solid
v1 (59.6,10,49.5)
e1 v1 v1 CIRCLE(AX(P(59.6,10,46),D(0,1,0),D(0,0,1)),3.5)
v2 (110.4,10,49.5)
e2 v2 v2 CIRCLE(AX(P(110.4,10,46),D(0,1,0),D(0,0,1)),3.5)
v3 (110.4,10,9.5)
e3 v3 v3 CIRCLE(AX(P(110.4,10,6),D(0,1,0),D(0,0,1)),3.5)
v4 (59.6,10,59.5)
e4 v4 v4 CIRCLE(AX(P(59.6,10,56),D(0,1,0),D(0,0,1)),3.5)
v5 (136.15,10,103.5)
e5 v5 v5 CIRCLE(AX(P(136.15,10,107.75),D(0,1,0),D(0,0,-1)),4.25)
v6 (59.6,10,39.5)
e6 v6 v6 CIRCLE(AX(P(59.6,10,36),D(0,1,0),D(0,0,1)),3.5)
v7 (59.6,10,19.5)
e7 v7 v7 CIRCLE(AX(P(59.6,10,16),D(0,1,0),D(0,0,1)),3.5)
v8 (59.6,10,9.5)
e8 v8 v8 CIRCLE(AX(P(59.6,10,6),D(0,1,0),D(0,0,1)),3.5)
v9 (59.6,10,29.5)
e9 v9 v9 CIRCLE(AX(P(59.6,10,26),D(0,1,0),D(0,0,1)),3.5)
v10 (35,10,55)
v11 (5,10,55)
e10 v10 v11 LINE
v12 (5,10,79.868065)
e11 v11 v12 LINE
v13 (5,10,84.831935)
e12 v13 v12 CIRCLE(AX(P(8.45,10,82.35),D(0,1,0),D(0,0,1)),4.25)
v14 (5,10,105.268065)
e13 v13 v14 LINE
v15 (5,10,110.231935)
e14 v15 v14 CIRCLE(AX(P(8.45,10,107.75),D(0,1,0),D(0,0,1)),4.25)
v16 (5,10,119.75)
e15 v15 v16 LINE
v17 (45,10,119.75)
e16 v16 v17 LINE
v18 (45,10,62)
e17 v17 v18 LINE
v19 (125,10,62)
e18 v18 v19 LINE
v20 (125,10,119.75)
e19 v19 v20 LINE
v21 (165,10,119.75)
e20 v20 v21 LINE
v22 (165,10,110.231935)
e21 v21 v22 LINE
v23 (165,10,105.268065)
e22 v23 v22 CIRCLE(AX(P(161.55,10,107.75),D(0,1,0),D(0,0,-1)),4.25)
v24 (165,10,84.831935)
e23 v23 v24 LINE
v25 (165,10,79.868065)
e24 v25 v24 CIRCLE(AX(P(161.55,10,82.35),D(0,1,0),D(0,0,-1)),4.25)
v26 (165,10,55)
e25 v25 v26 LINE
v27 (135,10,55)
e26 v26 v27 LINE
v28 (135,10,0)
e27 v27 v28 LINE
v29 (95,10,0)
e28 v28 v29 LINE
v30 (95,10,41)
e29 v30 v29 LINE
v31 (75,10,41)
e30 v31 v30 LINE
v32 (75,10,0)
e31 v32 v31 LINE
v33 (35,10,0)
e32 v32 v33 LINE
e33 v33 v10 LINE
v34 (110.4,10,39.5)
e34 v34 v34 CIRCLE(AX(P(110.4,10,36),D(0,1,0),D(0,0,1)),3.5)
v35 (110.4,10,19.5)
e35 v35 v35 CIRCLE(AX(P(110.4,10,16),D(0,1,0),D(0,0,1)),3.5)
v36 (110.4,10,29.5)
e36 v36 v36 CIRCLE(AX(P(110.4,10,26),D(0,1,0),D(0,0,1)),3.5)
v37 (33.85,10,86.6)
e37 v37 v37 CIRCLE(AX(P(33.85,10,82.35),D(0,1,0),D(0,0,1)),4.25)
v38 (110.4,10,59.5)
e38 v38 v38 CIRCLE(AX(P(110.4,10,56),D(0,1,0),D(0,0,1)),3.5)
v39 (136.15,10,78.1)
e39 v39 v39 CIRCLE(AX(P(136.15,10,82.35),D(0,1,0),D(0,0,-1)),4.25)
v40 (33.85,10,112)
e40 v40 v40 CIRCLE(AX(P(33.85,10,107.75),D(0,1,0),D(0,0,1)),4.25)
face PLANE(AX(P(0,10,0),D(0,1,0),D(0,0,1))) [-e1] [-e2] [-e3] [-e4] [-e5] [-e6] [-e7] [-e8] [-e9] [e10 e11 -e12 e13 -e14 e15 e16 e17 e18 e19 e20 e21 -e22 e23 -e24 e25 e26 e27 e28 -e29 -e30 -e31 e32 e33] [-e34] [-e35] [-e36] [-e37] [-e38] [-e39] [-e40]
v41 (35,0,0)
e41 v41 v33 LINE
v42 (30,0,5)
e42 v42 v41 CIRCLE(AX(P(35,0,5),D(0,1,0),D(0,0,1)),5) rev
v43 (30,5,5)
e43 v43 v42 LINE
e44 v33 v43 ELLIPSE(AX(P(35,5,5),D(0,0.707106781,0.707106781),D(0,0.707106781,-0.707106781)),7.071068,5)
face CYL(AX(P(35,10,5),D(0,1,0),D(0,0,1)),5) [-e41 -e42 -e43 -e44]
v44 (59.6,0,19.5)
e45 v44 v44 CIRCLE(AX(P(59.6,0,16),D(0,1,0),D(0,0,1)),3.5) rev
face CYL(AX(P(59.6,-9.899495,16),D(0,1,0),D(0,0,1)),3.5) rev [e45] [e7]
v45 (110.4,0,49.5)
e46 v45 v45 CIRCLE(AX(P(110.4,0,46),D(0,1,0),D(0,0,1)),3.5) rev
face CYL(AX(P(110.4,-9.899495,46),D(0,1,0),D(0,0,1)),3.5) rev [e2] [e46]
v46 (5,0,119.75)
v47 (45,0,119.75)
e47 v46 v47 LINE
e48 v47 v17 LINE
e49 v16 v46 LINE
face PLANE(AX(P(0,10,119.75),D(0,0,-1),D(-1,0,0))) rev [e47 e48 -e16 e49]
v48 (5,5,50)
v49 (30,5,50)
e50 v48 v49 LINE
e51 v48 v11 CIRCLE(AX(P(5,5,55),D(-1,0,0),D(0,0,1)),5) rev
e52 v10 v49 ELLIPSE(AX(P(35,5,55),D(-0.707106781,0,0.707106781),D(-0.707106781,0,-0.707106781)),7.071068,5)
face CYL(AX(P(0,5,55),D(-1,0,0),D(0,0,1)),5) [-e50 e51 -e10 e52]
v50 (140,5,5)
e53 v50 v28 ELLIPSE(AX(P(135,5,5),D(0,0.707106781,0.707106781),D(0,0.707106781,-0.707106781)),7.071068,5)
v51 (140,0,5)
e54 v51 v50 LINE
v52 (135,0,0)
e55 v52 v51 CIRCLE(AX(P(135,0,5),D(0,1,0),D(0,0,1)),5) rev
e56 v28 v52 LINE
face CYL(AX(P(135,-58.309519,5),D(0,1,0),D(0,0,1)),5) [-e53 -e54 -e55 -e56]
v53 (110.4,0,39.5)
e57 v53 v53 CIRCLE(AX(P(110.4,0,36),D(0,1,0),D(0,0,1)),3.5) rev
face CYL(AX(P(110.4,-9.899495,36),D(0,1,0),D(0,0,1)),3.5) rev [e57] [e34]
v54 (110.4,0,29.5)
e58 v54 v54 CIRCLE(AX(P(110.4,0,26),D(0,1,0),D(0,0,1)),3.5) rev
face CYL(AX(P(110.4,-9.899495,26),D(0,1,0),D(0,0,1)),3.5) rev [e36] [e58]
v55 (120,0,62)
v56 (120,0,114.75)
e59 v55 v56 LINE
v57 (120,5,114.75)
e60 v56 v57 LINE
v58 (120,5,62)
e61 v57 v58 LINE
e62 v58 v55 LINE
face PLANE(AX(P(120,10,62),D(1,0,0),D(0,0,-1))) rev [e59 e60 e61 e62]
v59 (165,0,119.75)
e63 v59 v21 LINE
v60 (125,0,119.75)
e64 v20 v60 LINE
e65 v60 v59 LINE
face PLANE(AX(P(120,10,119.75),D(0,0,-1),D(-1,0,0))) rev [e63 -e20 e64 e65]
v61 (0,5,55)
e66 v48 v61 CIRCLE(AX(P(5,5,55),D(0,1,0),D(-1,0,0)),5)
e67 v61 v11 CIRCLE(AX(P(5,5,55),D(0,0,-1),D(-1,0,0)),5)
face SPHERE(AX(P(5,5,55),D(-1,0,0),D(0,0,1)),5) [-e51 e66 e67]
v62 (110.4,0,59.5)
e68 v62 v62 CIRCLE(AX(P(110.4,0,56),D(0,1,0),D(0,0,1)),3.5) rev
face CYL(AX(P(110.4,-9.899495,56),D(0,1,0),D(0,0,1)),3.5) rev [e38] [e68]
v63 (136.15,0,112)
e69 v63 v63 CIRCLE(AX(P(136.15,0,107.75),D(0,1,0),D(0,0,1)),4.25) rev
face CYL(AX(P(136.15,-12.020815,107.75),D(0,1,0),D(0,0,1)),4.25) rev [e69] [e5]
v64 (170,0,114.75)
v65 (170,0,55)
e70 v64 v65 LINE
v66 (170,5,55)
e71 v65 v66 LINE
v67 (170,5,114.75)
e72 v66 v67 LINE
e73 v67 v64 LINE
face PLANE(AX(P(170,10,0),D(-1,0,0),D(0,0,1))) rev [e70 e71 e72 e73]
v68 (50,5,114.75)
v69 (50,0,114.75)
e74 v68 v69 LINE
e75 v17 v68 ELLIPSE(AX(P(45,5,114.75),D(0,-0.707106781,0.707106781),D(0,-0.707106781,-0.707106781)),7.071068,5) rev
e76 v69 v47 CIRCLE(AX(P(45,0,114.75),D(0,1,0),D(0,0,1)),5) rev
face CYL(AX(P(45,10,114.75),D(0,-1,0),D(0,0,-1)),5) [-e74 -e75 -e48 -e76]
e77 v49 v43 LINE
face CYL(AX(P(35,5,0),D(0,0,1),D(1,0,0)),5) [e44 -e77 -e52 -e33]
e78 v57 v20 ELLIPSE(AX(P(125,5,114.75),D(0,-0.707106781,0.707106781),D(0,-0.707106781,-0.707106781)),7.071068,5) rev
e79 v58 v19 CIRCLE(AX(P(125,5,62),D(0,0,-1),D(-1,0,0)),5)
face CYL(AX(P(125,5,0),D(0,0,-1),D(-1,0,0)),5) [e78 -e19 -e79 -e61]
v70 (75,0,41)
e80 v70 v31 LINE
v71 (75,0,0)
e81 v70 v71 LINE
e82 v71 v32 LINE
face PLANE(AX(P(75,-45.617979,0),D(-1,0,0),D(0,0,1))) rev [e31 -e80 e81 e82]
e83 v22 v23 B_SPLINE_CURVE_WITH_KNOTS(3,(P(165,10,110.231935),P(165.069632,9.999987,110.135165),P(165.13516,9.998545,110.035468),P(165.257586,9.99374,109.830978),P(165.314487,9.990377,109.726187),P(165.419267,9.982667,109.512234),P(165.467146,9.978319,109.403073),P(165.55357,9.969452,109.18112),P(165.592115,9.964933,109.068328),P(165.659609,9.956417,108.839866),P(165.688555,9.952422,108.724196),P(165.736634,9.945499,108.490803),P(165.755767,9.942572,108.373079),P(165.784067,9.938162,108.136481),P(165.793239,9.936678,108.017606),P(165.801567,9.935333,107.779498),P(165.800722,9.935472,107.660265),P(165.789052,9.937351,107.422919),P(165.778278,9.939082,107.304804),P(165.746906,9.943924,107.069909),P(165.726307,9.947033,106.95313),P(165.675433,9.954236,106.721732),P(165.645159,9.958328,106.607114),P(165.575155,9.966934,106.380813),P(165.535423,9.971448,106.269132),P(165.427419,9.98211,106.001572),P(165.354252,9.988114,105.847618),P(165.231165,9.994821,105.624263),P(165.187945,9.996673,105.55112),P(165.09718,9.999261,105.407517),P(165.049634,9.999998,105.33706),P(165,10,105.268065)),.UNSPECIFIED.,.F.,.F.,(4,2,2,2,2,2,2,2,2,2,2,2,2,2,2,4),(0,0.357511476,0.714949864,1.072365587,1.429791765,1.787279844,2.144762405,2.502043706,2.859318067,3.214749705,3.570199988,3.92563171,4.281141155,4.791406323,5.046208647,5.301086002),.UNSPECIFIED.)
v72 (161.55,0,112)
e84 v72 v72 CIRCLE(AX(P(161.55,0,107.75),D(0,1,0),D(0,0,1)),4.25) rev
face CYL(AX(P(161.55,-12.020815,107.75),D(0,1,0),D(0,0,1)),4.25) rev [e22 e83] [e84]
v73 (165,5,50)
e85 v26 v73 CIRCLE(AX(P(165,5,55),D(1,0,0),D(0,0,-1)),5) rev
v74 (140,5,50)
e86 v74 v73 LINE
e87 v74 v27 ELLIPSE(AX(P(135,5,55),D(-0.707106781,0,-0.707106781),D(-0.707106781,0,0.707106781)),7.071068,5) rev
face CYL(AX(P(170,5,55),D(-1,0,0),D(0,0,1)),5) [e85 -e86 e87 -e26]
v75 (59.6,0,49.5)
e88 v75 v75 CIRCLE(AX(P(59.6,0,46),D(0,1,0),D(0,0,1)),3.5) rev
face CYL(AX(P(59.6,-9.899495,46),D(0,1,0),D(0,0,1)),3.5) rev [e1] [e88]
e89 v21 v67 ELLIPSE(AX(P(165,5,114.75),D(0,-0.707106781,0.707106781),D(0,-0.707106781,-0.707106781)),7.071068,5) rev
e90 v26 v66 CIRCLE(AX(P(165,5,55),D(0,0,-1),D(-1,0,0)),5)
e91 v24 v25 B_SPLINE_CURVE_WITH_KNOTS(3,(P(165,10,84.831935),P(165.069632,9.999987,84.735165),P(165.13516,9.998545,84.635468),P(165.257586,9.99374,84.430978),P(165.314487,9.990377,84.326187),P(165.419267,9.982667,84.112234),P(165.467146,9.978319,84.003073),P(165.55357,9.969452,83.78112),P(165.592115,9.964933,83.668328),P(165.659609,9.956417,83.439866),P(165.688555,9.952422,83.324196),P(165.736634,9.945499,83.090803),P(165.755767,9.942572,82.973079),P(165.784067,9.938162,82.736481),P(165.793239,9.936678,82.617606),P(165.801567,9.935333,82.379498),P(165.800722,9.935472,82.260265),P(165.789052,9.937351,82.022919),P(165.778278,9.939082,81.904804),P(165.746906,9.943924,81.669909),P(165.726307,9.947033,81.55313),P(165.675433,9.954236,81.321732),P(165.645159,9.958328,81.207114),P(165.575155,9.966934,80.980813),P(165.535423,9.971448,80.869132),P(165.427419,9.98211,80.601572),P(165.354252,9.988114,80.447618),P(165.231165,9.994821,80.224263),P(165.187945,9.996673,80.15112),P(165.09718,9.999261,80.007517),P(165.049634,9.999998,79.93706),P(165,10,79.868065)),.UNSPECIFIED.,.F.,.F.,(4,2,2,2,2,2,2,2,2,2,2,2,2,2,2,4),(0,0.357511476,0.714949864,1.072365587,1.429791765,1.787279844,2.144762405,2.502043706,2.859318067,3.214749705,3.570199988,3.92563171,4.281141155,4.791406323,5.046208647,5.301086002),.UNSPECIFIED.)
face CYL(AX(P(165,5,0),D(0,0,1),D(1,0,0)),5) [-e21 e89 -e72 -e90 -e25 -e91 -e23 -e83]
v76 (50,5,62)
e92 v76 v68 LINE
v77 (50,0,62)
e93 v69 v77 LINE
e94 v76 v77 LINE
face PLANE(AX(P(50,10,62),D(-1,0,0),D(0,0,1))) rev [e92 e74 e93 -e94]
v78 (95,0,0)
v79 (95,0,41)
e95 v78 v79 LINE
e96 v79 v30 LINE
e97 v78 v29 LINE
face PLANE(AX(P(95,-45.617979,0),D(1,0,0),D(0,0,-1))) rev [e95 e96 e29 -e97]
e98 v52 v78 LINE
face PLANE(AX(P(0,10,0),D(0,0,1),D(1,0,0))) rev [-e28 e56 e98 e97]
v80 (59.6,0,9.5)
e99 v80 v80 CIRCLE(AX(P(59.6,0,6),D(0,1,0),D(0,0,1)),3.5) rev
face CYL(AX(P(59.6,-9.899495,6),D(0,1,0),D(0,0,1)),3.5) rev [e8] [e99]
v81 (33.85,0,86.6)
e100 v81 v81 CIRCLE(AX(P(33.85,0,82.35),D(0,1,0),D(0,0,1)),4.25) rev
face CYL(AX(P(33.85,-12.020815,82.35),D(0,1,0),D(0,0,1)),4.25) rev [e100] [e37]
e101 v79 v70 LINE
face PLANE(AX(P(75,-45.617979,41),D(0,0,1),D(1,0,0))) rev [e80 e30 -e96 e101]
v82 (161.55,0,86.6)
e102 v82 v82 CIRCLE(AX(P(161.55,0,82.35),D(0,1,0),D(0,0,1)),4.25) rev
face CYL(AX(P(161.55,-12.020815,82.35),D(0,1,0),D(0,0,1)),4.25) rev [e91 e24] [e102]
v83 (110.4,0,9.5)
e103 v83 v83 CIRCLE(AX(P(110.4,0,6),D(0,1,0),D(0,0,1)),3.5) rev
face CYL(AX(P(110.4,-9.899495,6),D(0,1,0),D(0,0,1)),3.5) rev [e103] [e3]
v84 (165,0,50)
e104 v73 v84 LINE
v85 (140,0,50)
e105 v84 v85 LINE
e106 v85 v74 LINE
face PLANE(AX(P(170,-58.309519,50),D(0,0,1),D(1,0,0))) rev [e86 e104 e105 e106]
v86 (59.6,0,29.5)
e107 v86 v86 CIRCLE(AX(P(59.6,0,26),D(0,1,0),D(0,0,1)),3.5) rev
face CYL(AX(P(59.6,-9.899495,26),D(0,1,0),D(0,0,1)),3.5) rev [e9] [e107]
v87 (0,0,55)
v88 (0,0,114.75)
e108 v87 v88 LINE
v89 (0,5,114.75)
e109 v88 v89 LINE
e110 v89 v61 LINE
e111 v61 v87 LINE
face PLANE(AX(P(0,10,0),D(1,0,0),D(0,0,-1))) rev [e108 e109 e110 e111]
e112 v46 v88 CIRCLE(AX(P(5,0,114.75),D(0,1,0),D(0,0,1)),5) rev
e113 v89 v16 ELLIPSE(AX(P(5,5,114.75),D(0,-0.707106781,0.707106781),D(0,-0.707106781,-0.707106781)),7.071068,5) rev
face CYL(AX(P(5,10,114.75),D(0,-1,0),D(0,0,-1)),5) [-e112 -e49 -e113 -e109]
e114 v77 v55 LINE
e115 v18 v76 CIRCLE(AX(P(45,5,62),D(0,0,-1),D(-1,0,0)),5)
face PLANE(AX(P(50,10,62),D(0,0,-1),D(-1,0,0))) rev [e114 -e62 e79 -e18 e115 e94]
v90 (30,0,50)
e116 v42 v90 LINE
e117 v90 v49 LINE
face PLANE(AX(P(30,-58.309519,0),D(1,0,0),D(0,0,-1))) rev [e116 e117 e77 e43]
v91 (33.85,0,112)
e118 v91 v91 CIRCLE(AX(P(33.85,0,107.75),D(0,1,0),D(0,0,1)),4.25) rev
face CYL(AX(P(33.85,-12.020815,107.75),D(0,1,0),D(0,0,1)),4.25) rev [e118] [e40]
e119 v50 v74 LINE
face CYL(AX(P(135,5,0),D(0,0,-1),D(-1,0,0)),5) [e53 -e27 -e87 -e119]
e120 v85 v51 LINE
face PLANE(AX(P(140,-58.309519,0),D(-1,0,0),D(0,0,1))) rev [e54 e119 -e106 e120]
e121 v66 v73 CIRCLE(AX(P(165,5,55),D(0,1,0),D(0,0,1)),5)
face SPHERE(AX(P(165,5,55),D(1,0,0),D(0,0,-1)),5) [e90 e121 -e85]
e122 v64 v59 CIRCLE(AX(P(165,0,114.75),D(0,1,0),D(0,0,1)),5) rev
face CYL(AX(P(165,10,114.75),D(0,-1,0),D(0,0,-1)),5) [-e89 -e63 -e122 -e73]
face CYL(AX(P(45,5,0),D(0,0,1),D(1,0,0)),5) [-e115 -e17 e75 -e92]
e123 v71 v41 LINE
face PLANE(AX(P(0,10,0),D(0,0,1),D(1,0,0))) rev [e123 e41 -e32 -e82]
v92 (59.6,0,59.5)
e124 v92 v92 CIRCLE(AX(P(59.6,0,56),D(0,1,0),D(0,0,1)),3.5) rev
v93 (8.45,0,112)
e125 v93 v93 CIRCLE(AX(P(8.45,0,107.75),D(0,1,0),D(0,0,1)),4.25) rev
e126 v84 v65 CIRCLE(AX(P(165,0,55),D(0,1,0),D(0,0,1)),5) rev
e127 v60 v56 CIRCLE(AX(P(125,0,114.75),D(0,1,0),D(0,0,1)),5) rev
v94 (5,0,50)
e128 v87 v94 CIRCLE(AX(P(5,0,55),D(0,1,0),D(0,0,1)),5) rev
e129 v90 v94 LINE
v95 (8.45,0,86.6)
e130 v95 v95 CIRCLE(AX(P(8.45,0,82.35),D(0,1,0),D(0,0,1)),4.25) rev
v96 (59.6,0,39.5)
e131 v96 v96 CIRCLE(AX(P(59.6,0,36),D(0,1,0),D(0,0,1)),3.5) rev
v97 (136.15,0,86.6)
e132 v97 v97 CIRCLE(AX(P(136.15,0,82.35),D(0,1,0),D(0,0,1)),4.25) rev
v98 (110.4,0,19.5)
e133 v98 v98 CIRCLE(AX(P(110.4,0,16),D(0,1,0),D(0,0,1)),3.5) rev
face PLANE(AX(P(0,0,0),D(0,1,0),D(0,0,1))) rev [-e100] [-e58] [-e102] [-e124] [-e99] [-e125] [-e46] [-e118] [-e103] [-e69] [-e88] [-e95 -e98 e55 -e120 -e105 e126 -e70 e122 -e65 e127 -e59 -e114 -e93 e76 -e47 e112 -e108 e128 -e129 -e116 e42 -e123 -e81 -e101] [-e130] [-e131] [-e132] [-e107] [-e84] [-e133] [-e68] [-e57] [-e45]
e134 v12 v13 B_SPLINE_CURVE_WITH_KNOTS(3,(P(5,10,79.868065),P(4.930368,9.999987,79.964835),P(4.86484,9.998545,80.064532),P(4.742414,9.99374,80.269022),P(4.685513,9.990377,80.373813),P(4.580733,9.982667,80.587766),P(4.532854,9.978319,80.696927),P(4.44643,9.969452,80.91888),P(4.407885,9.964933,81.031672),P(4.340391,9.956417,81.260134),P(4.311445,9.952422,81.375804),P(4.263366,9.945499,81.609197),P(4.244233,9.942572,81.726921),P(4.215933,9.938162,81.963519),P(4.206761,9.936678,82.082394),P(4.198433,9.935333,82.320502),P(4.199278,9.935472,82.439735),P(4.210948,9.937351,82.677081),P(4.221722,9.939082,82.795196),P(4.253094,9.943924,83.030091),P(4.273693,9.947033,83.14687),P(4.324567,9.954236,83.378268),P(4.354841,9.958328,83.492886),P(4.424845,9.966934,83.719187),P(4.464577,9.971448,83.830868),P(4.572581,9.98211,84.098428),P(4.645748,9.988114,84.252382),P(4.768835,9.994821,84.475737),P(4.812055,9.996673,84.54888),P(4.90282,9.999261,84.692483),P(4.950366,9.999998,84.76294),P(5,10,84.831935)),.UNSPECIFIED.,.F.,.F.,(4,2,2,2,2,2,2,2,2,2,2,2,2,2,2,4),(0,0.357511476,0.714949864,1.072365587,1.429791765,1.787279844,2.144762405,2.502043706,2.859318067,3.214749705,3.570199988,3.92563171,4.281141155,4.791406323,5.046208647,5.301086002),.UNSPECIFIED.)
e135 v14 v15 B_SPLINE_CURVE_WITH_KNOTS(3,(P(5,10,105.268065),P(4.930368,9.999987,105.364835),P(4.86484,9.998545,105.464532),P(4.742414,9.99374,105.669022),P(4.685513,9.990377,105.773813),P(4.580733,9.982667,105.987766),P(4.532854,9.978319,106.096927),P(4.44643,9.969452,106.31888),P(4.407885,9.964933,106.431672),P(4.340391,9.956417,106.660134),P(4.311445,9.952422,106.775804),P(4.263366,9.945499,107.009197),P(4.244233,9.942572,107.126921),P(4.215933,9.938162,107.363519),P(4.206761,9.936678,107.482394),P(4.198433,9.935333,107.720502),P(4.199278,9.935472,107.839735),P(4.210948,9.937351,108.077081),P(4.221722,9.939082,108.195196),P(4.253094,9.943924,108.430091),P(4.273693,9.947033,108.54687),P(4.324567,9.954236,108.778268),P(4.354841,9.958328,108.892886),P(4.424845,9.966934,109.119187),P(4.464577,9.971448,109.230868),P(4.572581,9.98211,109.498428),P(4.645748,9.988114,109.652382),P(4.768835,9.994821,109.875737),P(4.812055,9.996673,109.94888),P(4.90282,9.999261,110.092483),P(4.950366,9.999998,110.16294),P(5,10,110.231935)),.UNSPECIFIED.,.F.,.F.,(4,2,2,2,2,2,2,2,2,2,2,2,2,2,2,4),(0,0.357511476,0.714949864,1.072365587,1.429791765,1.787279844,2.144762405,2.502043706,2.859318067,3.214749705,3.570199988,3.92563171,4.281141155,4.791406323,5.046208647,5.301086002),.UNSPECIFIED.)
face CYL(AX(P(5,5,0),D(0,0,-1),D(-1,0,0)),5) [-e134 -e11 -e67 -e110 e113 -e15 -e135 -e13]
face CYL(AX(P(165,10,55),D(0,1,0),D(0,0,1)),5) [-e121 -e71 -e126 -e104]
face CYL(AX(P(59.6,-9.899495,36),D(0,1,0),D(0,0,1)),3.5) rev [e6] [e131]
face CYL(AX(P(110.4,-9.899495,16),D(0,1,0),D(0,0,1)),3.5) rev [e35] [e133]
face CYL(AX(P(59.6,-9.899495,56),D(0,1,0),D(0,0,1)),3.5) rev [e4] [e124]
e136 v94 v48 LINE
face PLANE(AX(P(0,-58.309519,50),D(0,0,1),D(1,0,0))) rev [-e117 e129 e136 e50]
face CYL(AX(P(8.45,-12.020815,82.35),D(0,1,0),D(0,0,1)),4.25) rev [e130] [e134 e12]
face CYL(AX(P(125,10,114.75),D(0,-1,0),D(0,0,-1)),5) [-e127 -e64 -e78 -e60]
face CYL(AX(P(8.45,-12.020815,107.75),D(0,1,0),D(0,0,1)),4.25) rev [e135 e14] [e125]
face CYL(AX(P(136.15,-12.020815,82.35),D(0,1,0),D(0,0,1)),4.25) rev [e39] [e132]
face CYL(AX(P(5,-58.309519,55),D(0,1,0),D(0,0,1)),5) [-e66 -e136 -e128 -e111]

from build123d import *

# Parameters (mm, degrees)
BOSS_EXTRUDE1_DEPTH  = 10
SKETCH2_R            = 4.25
CUT_EXTRUDE1_DEPTH   = 10
SKETCH3_R            = 3.5
CUT_EXTRUDE2_DEPTH   = 10
LPATTERN1_COUNT      = 2
LPATTERN1_PITCH      = 50.8
LPATTERN1_COUNT_DIR2 = 6
LPATTERN1_PITCH_DIR2 = 10
SKETCH4_W            = 30
SKETCH4_H            = 50
CUT_EXTRUDE3_DEPTH   = 10
FILLET1_R            = 5
SKETCH5_W            = 20
SKETCH5_H            = 41
CUT_EXTRUDE4_DEPTH   = 10


with BuildPart() as part:
    # Sketch1 → Boss-Extrude1 (new body)
    with BuildSketch(Plane(origin=(0, 0, 0), x_dir=(1, 0, 0), z_dir=(0, 1, 0))):
        Polygon((0, 0), (50, 0), (120, 0), (170, 0), (170, -119.75), (120, -119.75), (120, -62), (50, -62), (50, -119.75), (0, -119.75), align=None)
    extrude(amount=BOSS_EXTRUDE1_DEPTH)

    # Sketch2 → Cut-Extrude1 (cut)
    with BuildSketch(Plane(origin=(0, 10, 0), x_dir=(1, 0, 0), z_dir=(0, 1, 0))):
        with Locations(Location((33.85, -82.35, 0), (0, 0, 270))):
            Circle(SKETCH2_R)
        with Locations(Location((8.45, -82.35, 0), (0, 0, 270))):
            Circle(SKETCH2_R)
        with Locations(Location((33.85, -107.75, 0), (0, 0, 270))):
            Circle(SKETCH2_R)
        with Locations(Location((8.45, -107.75, 0), (0, 0, 270))):
            Circle(SKETCH2_R)
        with Locations(Location((161.55, -107.75, 0), (0, 0, 270))):
            Circle(SKETCH2_R)
        with Locations(Location((136.15, -107.75, 0), (0, 0, 270))):
            Circle(SKETCH2_R)
        with Locations(Location((136.15, -82.35, 0), (0, 0, 270))):
            Circle(SKETCH2_R)
        with Locations(Location((161.55, -82.35, 0), (0, 0, 270))):
            Circle(SKETCH2_R)
    extrude(amount=-CUT_EXTRUDE1_DEPTH, mode=Mode.SUBTRACT)

    # Sketch3 → Cut-Extrude2 (cut)
    with BuildSketch(Plane(origin=(0, 10, 0), x_dir=(1, 0, 0), z_dir=(0, 1, 0))):
        with Locations(Location((59.6, -6, 0), (0, 0, 270))):
            Circle(SKETCH3_R)
    cut_extrude2 = extrude(amount=-CUT_EXTRUDE2_DEPTH, mode=Mode.SUBTRACT)

    # LPattern1: Cut-Extrude2 2 × 6
    with Locations(*[(i * LPATTERN1_PITCH, 0, j * LPATTERN1_PITCH_DIR2) for i in range(LPATTERN1_COUNT) for j in range(LPATTERN1_COUNT_DIR2) if (i, j) != (0, 0)]):
        add(cut_extrude2, mode=Mode.SUBTRACT)

    # Sketch4 → Cut-Extrude3 (cut)
    with BuildSketch(Plane(origin=(0, 10, 0), x_dir=(1, 0, 0), z_dir=(0, 1, 0))):
        with Locations((15, -25)):
            Rectangle(SKETCH4_W, SKETCH4_H)
        with Locations((155, -25)):
            Rectangle(SKETCH4_W, SKETCH4_H)
    extrude(amount=-CUT_EXTRUDE3_DEPTH, mode=Mode.SUBTRACT)

    # Fillet1
    # the kernel refuses this fillet: 5 mm, written as the material it takes off along each edge
    with BuildSketch(Plane(origin=(5, 5, 55), x_dir=(0, 0, -1), z_dir=(0, 1, 0))) as fillet1_piece_1_section:
        Polygon((0, 0), (FILLET1_R, 0), (FILLET1_R, FILLET1_R), (0, FILLET1_R), align=None)
    fillet1_piece_1 = extrude(amount=FILLET1_R, mode=Mode.PRIVATE)
    fillet1_piece_1 = fillet1_piece_1 - Plane(origin=(5, 5, 55), x_dir=(0.7071067811865476, 0, 0.7071067811865475), z_dir=(0, 1, 0)) * Sphere(FILLET1_R, mode=Mode.PRIVATE)
    add(fillet1_piece_1, mode=Mode.SUBTRACT)
    with BuildSketch(Plane(origin=(165, 5, 55), x_dir=(1, 0, 0), z_dir=(0, 1, 0))) as fillet1_piece_2_section:
        Polygon((0, 0), (FILLET1_R, 0), (FILLET1_R, FILLET1_R), (0, FILLET1_R), align=None)
    fillet1_piece_2 = extrude(amount=FILLET1_R, mode=Mode.PRIVATE)
    fillet1_piece_2 = fillet1_piece_2 - Plane(origin=(165, 5, 55), x_dir=(-0.7071067811865475, 0, 0.7071067811865476), z_dir=(0, 1, 0)) * Sphere(FILLET1_R, mode=Mode.PRIVATE)
    add(fillet1_piece_2, mode=Mode.SUBTRACT)
    with BuildSketch(Plane(origin=(0, 10, 132.25), x_dir=(1, 0, 0), z_dir=(0, 0, -1)), Plane(origin=(170, 10, 55), x_dir=(-1, 0, 0), z_dir=(0, 0, 1))) as fillet1_piece_3:
        with BuildLine():
            CenterArc((FILLET1_R, FILLET1_R), FILLET1_R, 180, 90)
            Line((0, FILLET1_R), (0, 0))
            Line((0, 0), (FILLET1_R, 0))
        make_face()
    extrude(amount=77.25, mode=Mode.SUBTRACT)
    with BuildSketch(Plane(origin=(0, 5, 50), x_dir=(1, 0, 0), z_dir=(0, -1, 0)), Plane(origin=(170, 5, 50), x_dir=(0, 0, 1), z_dir=(0, -1, 0))) as fillet1_piece_4:
        with BuildLine():
            CenterArc((FILLET1_R, FILLET1_R), FILLET1_R, 180, 90)
            Line((0, FILLET1_R), (0, 0))
            Line((0, 0), (FILLET1_R, 0))
        make_face()
    extrude(amount=17.5, mode=Mode.SUBTRACT)
    with BuildSketch(Plane(origin=(30, 22.5, 0), x_dir=(1, 0, 0), z_dir=(0, -1, 0))) as fillet1_piece_5:
        with BuildLine():
            CenterArc((FILLET1_R, FILLET1_R), FILLET1_R, 180, 90)
            Line((0, FILLET1_R), (0, 0))
            Line((0, 0), (FILLET1_R, 0))
        make_face()
    extrude(amount=35, mode=Mode.SUBTRACT)
    with BuildSketch(Plane(origin=(30, 10, 50), x_dir=(0, 0, 1), z_dir=(-1, 0, 0))) as fillet1_piece_6:
        with BuildLine():
            CenterArc((FILLET1_R, -FILLET1_R), FILLET1_R, 90, 90)
            Line((0, -FILLET1_R), (0, 0))
            Line((0, 0), (FILLET1_R, 0))
        make_face()
    extrude(amount=25, mode=Mode.SUBTRACT)
    with BuildSketch(Plane(origin=(30, 10, -12.5), x_dir=(1, 0, 0), z_dir=(0, 0, 1)), Plane(origin=(140, 10, -12.5), x_dir=(0, -1, 0), z_dir=(0, 0, 1))) as fillet1_piece_7:
        with BuildLine():
            CenterArc((FILLET1_R, -FILLET1_R), FILLET1_R, 90, 90)
            Line((0, -FILLET1_R), (0, 0))
            Line((0, 0), (FILLET1_R, 0))
        make_face()
    extrude(amount=62.5, mode=Mode.SUBTRACT)
    with BuildSketch(Plane(origin=(140, 22.5, 0), x_dir=(-1, 0, 0), z_dir=(0, -1, 0)), Plane(origin=(170, -12.5, 119.75), x_dir=(-1, 0, 0), z_dir=(0, 1, 0)), Plane(origin=(120, -12.5, 119.75), x_dir=(0, 0, -1), z_dir=(0, 1, 0)), Plane(origin=(50, -12.5, 119.75), x_dir=(-1, 0, 0), z_dir=(0, 1, 0)), Plane(origin=(0, -12.5, 119.75), x_dir=(0, 0, -1), z_dir=(0, 1, 0))) as fillet1_piece_8:
        with BuildLine():
            CenterArc((FILLET1_R, -FILLET1_R), FILLET1_R, 90, 90)
            Line((0, -FILLET1_R), (0, 0))
            Line((0, 0), (FILLET1_R, 0))
        make_face()
    extrude(amount=35, mode=Mode.SUBTRACT)
    with BuildSketch(Plane(origin=(140, 10, 50), x_dir=(0, 0, 1), z_dir=(1, 0, 0))) as fillet1_piece_9:
        with BuildLine():
            CenterArc((FILLET1_R, FILLET1_R), FILLET1_R, 180, 90)
            Line((0, FILLET1_R), (0, 0))
            Line((0, 0), (FILLET1_R, 0))
        make_face()
    extrude(amount=25, mode=Mode.SUBTRACT)
    with BuildSketch(Plane(origin=(50, 10, 62), x_dir=(-1, 0, 0), z_dir=(0, 0, 1)), Plane(origin=(120, 10, 132.25), x_dir=(1, 0, 0), z_dir=(0, 0, -1))) as fillet1_piece_10:
        with BuildLine():
            CenterArc((FILLET1_R, FILLET1_R), FILLET1_R, 180, 90)
            Line((0, FILLET1_R), (0, 0))
            Line((0, 0), (FILLET1_R, 0))
        make_face()
    extrude(amount=70.25, mode=Mode.SUBTRACT)
    with BuildSketch(Plane(origin=(30, 10, -12.5), x_dir=(1, 0, 0), z_dir=(0, 0, 1))) as fillet1_piece_11a_section:
        with BuildLine():
            CenterArc((FILLET1_R, -FILLET1_R), FILLET1_R, 90, 90)
            Line((0, -FILLET1_R), (0, 0))
            Line((0, 0), (FILLET1_R, 0))
        make_face()
    fillet1_piece_11a = extrude(amount=75, mode=Mode.PRIVATE)
    fillet1_piece_11a = split(fillet1_piece_11a, bisect_by=Plane(origin=(31.131975571, 8.868024429, 50), z_dir=(0, 0, 1)), keep=Keep.TOP, mode=Mode.PRIVATE)
    with BuildSketch(Plane(origin=(42.5, 10, 50), x_dir=(0, 0, 1), z_dir=(-1, 0, 0))) as fillet1_piece_11b_section:
        with BuildLine():
            CenterArc((FILLET1_R, -FILLET1_R), FILLET1_R, 90, 90)
            Line((0, -FILLET1_R), (0, 0))
            Line((0, 0), (FILLET1_R, 0))
        make_face()
    fillet1_piece_11b = extrude(amount=37.5, mode=Mode.PRIVATE)
    fillet1_piece_11b = split(fillet1_piece_11b, bisect_by=Plane(origin=(30, 8.868024429, 51.131975571), z_dir=(1, 0, 0)), keep=Keep.TOP, mode=Mode.PRIVATE)
    fillet1_piece_11 = fillet1_piece_11a & fillet1_piece_11b
    add(fillet1_piece_11, mode=Mode.SUBTRACT)
    with BuildSketch(Plane(origin=(140, 10, -12.5), x_dir=(0, -1, 0), z_dir=(0, 0, 1))) as fillet1_piece_12a_section:
        with BuildLine():
            CenterArc((FILLET1_R, -FILLET1_R), FILLET1_R, 90, 90)
            Line((0, -FILLET1_R), (0, 0))
            Line((0, 0), (FILLET1_R, 0))
        make_face()
    fillet1_piece_12a = extrude(amount=75, mode=Mode.PRIVATE)
    fillet1_piece_12a = split(fillet1_piece_12a, bisect_by=Plane(origin=(138.868024429, 8.868024429, 50), z_dir=(0, 0, 1)), keep=Keep.TOP, mode=Mode.PRIVATE)
    with BuildSketch(Plane(origin=(127.5, 10, 50), x_dir=(0, 0, 1), z_dir=(1, 0, 0))) as fillet1_piece_12b_section:
        with BuildLine():
            CenterArc((FILLET1_R, FILLET1_R), FILLET1_R, 180, 90)
            Line((0, FILLET1_R), (0, 0))
            Line((0, 0), (FILLET1_R, 0))
        make_face()
    fillet1_piece_12b = extrude(amount=37.5, mode=Mode.PRIVATE)
    fillet1_piece_12b = split(fillet1_piece_12b, bisect_by=Plane(origin=(140, 8.868024429, 51.131975571), z_dir=(-1, 0, 0)), keep=Keep.TOP, mode=Mode.PRIVATE)
    fillet1_piece_12 = fillet1_piece_12a & fillet1_piece_12b
    add(fillet1_piece_12, mode=Mode.SUBTRACT)

    # Sketch5 → Cut-Extrude4 (cut)
    with BuildSketch(Plane(origin=(0, 10, 0), x_dir=(1, 0, 0), z_dir=(0, 1, 0))):
        with Locations((85, -20.5)):
            Rectangle(SKETCH5_W, SKETCH5_H)
    extrude(amount=-CUT_EXTRUDE4_DEPTH, mode=Mode.SUBTRACT)


solid = part.part
